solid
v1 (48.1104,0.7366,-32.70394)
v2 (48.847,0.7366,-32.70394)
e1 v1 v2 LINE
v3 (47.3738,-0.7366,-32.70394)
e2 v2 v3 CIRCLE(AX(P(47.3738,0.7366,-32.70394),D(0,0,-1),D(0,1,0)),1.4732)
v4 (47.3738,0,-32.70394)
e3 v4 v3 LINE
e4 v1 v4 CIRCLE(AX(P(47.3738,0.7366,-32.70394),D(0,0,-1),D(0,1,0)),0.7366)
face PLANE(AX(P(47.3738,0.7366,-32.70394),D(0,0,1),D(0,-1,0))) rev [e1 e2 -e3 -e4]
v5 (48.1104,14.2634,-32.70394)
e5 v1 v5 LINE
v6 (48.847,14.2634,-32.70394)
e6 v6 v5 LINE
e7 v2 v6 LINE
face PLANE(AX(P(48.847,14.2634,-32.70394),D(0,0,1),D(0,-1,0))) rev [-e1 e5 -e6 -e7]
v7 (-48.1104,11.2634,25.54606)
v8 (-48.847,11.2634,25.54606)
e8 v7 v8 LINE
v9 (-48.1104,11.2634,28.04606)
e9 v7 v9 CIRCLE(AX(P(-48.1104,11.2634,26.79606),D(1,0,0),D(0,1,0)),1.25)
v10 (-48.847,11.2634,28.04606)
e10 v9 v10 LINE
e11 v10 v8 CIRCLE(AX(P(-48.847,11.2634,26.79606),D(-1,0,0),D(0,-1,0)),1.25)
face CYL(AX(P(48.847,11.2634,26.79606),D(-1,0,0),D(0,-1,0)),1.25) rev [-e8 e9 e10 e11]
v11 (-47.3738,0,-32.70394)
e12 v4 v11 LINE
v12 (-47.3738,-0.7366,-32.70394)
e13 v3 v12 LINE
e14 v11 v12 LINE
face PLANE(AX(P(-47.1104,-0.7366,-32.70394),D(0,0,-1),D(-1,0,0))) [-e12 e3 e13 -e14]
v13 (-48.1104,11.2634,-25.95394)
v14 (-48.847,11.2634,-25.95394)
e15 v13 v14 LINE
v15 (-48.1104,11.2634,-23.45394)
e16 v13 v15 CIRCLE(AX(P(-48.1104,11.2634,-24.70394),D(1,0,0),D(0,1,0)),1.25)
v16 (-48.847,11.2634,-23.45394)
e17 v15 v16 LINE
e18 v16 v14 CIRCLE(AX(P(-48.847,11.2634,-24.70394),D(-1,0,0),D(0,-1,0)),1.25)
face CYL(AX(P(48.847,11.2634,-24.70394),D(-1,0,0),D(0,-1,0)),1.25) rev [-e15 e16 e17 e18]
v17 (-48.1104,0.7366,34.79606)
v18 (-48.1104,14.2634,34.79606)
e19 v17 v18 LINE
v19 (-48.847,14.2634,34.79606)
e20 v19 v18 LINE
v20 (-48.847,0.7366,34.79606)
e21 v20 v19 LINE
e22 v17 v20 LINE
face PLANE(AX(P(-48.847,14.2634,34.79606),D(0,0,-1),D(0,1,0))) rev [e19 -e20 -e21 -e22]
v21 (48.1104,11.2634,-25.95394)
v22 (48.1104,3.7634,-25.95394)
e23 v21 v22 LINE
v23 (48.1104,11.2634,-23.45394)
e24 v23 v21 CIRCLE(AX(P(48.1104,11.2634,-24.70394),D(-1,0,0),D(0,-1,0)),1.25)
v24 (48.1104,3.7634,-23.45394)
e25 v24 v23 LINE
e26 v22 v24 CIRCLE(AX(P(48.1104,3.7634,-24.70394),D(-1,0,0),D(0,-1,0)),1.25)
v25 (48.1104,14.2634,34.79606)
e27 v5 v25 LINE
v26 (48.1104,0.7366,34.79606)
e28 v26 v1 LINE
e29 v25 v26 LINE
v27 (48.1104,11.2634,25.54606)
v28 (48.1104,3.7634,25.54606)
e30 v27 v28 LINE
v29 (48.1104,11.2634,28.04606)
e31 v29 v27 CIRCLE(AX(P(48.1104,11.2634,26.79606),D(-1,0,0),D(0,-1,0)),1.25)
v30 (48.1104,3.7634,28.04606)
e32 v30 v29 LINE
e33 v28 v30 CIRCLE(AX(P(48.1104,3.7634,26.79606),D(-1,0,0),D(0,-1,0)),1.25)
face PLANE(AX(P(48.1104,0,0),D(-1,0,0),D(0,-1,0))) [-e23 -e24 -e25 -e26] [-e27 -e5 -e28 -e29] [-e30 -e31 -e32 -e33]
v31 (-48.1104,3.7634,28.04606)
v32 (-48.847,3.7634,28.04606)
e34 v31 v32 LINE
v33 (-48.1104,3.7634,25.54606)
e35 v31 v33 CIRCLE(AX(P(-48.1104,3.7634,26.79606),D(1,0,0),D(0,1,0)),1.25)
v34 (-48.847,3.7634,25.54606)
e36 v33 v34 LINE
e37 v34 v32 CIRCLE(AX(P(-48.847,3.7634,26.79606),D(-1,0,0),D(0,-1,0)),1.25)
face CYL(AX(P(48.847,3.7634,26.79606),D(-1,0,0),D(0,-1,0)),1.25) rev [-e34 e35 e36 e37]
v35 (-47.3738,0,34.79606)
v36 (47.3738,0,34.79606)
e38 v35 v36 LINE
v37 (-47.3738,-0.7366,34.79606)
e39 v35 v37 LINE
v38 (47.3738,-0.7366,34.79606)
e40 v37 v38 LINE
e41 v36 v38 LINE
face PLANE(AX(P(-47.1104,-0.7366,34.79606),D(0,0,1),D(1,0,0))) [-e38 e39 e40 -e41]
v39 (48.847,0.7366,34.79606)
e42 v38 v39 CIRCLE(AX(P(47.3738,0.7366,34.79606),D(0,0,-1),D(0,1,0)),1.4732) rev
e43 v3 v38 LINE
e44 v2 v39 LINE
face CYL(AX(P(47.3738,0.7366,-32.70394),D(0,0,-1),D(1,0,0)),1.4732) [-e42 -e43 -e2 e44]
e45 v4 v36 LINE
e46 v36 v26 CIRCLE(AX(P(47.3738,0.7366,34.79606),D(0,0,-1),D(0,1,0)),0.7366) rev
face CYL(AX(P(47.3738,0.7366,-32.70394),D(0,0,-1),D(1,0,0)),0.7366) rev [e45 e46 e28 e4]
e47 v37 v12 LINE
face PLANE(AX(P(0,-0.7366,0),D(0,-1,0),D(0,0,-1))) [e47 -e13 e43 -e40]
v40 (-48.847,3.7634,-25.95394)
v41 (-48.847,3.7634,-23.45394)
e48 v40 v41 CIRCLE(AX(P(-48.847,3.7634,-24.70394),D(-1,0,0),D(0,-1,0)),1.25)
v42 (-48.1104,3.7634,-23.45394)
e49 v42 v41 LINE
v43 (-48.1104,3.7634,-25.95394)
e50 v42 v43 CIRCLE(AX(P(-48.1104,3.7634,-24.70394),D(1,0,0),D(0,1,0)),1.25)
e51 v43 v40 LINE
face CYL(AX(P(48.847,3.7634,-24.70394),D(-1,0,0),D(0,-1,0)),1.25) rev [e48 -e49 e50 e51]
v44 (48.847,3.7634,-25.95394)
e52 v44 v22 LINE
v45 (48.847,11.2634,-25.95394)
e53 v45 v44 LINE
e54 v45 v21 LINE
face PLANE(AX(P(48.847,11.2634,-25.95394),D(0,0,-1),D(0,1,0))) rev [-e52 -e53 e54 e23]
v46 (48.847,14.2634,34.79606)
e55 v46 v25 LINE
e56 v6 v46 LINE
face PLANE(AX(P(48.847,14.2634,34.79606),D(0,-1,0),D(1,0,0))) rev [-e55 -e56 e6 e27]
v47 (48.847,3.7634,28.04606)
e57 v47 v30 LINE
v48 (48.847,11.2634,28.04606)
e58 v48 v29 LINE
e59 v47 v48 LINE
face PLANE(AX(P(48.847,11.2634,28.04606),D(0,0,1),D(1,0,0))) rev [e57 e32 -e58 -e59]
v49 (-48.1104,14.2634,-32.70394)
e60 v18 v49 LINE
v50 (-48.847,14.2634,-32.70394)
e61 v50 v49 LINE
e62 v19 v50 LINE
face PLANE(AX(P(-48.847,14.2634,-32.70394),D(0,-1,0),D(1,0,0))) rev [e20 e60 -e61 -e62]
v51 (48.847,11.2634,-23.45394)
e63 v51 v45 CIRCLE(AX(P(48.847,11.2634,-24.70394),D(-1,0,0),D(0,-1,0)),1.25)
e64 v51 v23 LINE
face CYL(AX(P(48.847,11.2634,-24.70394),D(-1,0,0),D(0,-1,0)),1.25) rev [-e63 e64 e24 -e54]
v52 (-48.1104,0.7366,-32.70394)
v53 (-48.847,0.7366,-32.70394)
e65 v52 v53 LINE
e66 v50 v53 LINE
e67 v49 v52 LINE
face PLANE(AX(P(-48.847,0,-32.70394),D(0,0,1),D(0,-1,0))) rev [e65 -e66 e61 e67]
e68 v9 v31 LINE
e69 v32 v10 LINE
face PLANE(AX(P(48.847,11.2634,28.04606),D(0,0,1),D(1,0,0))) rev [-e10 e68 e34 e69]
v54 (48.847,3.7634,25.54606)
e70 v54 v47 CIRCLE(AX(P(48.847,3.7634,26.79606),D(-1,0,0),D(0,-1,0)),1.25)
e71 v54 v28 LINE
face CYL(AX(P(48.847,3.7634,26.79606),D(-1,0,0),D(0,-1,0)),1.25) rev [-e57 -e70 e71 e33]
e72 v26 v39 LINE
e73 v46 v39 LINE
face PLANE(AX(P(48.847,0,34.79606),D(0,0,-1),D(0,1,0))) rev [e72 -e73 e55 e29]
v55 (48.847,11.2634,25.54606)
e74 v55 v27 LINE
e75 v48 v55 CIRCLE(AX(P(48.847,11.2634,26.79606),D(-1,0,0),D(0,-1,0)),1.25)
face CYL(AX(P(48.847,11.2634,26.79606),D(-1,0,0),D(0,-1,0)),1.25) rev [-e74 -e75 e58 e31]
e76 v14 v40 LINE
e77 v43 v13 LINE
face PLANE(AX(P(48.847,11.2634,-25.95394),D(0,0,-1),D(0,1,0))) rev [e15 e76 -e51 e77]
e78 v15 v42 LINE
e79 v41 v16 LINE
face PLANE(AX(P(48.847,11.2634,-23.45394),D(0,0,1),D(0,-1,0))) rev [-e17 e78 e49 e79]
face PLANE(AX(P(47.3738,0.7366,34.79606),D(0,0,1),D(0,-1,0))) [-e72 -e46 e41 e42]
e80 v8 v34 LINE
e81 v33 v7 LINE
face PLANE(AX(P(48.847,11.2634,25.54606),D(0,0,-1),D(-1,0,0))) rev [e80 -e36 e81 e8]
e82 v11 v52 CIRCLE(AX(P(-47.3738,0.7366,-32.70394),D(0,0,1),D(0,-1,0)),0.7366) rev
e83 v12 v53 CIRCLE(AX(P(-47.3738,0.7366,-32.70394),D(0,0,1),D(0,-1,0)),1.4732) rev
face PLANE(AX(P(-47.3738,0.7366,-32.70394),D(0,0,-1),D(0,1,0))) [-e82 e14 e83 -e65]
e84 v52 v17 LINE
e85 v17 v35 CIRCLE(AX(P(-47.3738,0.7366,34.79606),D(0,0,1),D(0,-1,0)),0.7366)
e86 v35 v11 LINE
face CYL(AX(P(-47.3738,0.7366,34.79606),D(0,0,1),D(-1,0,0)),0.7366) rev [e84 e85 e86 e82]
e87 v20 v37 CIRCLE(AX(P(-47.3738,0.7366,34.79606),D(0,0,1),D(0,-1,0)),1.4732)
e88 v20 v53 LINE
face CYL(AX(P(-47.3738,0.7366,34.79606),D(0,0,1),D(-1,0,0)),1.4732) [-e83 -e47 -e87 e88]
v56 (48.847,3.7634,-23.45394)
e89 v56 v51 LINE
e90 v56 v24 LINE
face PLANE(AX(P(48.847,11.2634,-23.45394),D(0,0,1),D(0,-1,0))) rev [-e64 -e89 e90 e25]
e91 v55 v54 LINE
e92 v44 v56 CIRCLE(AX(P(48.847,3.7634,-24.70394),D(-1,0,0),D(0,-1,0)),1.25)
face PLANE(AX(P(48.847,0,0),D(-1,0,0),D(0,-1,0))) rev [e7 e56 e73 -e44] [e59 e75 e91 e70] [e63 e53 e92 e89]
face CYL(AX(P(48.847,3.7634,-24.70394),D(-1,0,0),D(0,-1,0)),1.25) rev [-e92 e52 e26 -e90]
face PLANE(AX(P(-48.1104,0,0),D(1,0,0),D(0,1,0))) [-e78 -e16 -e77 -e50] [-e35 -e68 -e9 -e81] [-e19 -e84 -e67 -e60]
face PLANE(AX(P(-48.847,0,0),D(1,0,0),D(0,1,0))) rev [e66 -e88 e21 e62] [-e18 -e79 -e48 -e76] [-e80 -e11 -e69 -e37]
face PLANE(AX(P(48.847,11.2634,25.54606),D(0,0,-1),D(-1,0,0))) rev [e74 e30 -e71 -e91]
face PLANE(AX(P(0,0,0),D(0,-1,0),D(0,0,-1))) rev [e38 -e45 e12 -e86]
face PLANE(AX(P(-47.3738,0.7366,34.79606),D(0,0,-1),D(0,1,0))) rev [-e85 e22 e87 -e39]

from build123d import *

# Parameters (mm, degrees)
SKETCH1_W               = 94.2208
SKETCH1_H               = 67.5
BASE_FLANGE1_DEPTH      = 0.7366
EDGE_FLANGE1_DEPTH      = 67.5
EDGE_FLANGE1_BEND_DEPTH = 67.5
CUT_EXTRUDE1_DEPTH      = 105.682033016


# Sheet-metal steps are written as plain solids
with BuildPart() as part:
    # Sketch1 → Base-Flange1 (new body)
    with BuildSketch(Plane(origin=(0, 0, 0), x_dir=(1, 0, 0), z_dir=(0, 1, 0))):
        with Locations((0, -1.046060421)):
            Rectangle(SKETCH1_W, SKETCH1_H)
    extrude(amount=-BASE_FLANGE1_DEPTH)

    # Edge-Flange1 section (across the edge) → Edge-Flange1 (add)
    with BuildSketch(Plane(origin=(48.1104, 0, 34.796060421), x_dir=(-1, 0, 0), z_dir=(0, 0, -1))):
        with BuildLine():
            Line((-0.7366, 0.7366), (-0.7366, 14.2634))
            Line((-0.7366, 14.2634), (0, 14.2634))
            Line((0, 14.2634), (0, 0.7366))
            ThreePointArc((0, 0.7366), (0.215745145, 0.215745145), (0.7366, 0))
            Line((0.7366, 0), (1, 0))
            Line((1, 0), (1, -0.7366))
            Line((1, -0.7366), (0.7366, -0.7366))
            ThreePointArc((0.7366, -0.7366), (-0.30510971, -0.30510971), (-0.7366, 0.7366))
        make_face()
    extrude(amount=EDGE_FLANGE1_DEPTH)

    # Edge-Flange1 section 2 (across the edge) → Edge-Flange1 bend (add)
    with BuildSketch(Plane(origin=(-48.1104, 0, -32.703939579), x_dir=(1, 0, 0), z_dir=(0, 0, 1))):
        with BuildLine():
            Line((-0.7366, 0.7366), (-0.7366, 14.2634))
            Line((-0.7366, 14.2634), (0, 14.2634))
            Line((0, 14.2634), (0, 0.7366))
            ThreePointArc((0, 0.7366), (0.215745145, 0.215745145), (0.7366, 0))
            Line((0.7366, 0), (1, 0))
            Line((1, 0), (1, -0.7366))
            Line((1, -0.7366), (0.7366, -0.7366))
            ThreePointArc((0.7366, -0.7366), (-0.30510971, -0.30510971), (-0.7366, 0.7366))
        make_face()
    extrude(amount=EDGE_FLANGE1_BEND_DEPTH)

    # Sketch13 → Cut-Extrude1 (cut, through all)
    with BuildSketch(Plane.ZY.offset(48.847)):
        with BuildLine():
            Line((28.046060421, 11.2634), (28.046060421, 3.7634))
            ThreePointArc((28.046060421, 3.7634), (26.796060421, 2.5134), (25.546060421, 3.7634))
            Line((25.546060421, 3.7634), (25.546060421, 11.2634))
            ThreePointArc((25.546060421, 11.2634), (26.796060421, 12.5134), (28.046060421, 11.2634))
        make_face()
        with BuildLine():
            Line((-23.453939579, 11.2634), (-23.453939579, 3.7634))
            ThreePointArc((-23.453939579, 3.7634), (-24.703939579, 2.5134), (-25.953939579, 3.7634))
            Line((-25.953939579, 3.7634), (-25.953939579, 11.2634))
            ThreePointArc((-25.953939579, 11.2634), (-24.703939579, 12.5134), (-23.453939579, 11.2634))
        make_face()
    extrude(amount=-CUT_EXTRUDE1_DEPTH, mode=Mode.SUBTRACT)


solid = part.part
